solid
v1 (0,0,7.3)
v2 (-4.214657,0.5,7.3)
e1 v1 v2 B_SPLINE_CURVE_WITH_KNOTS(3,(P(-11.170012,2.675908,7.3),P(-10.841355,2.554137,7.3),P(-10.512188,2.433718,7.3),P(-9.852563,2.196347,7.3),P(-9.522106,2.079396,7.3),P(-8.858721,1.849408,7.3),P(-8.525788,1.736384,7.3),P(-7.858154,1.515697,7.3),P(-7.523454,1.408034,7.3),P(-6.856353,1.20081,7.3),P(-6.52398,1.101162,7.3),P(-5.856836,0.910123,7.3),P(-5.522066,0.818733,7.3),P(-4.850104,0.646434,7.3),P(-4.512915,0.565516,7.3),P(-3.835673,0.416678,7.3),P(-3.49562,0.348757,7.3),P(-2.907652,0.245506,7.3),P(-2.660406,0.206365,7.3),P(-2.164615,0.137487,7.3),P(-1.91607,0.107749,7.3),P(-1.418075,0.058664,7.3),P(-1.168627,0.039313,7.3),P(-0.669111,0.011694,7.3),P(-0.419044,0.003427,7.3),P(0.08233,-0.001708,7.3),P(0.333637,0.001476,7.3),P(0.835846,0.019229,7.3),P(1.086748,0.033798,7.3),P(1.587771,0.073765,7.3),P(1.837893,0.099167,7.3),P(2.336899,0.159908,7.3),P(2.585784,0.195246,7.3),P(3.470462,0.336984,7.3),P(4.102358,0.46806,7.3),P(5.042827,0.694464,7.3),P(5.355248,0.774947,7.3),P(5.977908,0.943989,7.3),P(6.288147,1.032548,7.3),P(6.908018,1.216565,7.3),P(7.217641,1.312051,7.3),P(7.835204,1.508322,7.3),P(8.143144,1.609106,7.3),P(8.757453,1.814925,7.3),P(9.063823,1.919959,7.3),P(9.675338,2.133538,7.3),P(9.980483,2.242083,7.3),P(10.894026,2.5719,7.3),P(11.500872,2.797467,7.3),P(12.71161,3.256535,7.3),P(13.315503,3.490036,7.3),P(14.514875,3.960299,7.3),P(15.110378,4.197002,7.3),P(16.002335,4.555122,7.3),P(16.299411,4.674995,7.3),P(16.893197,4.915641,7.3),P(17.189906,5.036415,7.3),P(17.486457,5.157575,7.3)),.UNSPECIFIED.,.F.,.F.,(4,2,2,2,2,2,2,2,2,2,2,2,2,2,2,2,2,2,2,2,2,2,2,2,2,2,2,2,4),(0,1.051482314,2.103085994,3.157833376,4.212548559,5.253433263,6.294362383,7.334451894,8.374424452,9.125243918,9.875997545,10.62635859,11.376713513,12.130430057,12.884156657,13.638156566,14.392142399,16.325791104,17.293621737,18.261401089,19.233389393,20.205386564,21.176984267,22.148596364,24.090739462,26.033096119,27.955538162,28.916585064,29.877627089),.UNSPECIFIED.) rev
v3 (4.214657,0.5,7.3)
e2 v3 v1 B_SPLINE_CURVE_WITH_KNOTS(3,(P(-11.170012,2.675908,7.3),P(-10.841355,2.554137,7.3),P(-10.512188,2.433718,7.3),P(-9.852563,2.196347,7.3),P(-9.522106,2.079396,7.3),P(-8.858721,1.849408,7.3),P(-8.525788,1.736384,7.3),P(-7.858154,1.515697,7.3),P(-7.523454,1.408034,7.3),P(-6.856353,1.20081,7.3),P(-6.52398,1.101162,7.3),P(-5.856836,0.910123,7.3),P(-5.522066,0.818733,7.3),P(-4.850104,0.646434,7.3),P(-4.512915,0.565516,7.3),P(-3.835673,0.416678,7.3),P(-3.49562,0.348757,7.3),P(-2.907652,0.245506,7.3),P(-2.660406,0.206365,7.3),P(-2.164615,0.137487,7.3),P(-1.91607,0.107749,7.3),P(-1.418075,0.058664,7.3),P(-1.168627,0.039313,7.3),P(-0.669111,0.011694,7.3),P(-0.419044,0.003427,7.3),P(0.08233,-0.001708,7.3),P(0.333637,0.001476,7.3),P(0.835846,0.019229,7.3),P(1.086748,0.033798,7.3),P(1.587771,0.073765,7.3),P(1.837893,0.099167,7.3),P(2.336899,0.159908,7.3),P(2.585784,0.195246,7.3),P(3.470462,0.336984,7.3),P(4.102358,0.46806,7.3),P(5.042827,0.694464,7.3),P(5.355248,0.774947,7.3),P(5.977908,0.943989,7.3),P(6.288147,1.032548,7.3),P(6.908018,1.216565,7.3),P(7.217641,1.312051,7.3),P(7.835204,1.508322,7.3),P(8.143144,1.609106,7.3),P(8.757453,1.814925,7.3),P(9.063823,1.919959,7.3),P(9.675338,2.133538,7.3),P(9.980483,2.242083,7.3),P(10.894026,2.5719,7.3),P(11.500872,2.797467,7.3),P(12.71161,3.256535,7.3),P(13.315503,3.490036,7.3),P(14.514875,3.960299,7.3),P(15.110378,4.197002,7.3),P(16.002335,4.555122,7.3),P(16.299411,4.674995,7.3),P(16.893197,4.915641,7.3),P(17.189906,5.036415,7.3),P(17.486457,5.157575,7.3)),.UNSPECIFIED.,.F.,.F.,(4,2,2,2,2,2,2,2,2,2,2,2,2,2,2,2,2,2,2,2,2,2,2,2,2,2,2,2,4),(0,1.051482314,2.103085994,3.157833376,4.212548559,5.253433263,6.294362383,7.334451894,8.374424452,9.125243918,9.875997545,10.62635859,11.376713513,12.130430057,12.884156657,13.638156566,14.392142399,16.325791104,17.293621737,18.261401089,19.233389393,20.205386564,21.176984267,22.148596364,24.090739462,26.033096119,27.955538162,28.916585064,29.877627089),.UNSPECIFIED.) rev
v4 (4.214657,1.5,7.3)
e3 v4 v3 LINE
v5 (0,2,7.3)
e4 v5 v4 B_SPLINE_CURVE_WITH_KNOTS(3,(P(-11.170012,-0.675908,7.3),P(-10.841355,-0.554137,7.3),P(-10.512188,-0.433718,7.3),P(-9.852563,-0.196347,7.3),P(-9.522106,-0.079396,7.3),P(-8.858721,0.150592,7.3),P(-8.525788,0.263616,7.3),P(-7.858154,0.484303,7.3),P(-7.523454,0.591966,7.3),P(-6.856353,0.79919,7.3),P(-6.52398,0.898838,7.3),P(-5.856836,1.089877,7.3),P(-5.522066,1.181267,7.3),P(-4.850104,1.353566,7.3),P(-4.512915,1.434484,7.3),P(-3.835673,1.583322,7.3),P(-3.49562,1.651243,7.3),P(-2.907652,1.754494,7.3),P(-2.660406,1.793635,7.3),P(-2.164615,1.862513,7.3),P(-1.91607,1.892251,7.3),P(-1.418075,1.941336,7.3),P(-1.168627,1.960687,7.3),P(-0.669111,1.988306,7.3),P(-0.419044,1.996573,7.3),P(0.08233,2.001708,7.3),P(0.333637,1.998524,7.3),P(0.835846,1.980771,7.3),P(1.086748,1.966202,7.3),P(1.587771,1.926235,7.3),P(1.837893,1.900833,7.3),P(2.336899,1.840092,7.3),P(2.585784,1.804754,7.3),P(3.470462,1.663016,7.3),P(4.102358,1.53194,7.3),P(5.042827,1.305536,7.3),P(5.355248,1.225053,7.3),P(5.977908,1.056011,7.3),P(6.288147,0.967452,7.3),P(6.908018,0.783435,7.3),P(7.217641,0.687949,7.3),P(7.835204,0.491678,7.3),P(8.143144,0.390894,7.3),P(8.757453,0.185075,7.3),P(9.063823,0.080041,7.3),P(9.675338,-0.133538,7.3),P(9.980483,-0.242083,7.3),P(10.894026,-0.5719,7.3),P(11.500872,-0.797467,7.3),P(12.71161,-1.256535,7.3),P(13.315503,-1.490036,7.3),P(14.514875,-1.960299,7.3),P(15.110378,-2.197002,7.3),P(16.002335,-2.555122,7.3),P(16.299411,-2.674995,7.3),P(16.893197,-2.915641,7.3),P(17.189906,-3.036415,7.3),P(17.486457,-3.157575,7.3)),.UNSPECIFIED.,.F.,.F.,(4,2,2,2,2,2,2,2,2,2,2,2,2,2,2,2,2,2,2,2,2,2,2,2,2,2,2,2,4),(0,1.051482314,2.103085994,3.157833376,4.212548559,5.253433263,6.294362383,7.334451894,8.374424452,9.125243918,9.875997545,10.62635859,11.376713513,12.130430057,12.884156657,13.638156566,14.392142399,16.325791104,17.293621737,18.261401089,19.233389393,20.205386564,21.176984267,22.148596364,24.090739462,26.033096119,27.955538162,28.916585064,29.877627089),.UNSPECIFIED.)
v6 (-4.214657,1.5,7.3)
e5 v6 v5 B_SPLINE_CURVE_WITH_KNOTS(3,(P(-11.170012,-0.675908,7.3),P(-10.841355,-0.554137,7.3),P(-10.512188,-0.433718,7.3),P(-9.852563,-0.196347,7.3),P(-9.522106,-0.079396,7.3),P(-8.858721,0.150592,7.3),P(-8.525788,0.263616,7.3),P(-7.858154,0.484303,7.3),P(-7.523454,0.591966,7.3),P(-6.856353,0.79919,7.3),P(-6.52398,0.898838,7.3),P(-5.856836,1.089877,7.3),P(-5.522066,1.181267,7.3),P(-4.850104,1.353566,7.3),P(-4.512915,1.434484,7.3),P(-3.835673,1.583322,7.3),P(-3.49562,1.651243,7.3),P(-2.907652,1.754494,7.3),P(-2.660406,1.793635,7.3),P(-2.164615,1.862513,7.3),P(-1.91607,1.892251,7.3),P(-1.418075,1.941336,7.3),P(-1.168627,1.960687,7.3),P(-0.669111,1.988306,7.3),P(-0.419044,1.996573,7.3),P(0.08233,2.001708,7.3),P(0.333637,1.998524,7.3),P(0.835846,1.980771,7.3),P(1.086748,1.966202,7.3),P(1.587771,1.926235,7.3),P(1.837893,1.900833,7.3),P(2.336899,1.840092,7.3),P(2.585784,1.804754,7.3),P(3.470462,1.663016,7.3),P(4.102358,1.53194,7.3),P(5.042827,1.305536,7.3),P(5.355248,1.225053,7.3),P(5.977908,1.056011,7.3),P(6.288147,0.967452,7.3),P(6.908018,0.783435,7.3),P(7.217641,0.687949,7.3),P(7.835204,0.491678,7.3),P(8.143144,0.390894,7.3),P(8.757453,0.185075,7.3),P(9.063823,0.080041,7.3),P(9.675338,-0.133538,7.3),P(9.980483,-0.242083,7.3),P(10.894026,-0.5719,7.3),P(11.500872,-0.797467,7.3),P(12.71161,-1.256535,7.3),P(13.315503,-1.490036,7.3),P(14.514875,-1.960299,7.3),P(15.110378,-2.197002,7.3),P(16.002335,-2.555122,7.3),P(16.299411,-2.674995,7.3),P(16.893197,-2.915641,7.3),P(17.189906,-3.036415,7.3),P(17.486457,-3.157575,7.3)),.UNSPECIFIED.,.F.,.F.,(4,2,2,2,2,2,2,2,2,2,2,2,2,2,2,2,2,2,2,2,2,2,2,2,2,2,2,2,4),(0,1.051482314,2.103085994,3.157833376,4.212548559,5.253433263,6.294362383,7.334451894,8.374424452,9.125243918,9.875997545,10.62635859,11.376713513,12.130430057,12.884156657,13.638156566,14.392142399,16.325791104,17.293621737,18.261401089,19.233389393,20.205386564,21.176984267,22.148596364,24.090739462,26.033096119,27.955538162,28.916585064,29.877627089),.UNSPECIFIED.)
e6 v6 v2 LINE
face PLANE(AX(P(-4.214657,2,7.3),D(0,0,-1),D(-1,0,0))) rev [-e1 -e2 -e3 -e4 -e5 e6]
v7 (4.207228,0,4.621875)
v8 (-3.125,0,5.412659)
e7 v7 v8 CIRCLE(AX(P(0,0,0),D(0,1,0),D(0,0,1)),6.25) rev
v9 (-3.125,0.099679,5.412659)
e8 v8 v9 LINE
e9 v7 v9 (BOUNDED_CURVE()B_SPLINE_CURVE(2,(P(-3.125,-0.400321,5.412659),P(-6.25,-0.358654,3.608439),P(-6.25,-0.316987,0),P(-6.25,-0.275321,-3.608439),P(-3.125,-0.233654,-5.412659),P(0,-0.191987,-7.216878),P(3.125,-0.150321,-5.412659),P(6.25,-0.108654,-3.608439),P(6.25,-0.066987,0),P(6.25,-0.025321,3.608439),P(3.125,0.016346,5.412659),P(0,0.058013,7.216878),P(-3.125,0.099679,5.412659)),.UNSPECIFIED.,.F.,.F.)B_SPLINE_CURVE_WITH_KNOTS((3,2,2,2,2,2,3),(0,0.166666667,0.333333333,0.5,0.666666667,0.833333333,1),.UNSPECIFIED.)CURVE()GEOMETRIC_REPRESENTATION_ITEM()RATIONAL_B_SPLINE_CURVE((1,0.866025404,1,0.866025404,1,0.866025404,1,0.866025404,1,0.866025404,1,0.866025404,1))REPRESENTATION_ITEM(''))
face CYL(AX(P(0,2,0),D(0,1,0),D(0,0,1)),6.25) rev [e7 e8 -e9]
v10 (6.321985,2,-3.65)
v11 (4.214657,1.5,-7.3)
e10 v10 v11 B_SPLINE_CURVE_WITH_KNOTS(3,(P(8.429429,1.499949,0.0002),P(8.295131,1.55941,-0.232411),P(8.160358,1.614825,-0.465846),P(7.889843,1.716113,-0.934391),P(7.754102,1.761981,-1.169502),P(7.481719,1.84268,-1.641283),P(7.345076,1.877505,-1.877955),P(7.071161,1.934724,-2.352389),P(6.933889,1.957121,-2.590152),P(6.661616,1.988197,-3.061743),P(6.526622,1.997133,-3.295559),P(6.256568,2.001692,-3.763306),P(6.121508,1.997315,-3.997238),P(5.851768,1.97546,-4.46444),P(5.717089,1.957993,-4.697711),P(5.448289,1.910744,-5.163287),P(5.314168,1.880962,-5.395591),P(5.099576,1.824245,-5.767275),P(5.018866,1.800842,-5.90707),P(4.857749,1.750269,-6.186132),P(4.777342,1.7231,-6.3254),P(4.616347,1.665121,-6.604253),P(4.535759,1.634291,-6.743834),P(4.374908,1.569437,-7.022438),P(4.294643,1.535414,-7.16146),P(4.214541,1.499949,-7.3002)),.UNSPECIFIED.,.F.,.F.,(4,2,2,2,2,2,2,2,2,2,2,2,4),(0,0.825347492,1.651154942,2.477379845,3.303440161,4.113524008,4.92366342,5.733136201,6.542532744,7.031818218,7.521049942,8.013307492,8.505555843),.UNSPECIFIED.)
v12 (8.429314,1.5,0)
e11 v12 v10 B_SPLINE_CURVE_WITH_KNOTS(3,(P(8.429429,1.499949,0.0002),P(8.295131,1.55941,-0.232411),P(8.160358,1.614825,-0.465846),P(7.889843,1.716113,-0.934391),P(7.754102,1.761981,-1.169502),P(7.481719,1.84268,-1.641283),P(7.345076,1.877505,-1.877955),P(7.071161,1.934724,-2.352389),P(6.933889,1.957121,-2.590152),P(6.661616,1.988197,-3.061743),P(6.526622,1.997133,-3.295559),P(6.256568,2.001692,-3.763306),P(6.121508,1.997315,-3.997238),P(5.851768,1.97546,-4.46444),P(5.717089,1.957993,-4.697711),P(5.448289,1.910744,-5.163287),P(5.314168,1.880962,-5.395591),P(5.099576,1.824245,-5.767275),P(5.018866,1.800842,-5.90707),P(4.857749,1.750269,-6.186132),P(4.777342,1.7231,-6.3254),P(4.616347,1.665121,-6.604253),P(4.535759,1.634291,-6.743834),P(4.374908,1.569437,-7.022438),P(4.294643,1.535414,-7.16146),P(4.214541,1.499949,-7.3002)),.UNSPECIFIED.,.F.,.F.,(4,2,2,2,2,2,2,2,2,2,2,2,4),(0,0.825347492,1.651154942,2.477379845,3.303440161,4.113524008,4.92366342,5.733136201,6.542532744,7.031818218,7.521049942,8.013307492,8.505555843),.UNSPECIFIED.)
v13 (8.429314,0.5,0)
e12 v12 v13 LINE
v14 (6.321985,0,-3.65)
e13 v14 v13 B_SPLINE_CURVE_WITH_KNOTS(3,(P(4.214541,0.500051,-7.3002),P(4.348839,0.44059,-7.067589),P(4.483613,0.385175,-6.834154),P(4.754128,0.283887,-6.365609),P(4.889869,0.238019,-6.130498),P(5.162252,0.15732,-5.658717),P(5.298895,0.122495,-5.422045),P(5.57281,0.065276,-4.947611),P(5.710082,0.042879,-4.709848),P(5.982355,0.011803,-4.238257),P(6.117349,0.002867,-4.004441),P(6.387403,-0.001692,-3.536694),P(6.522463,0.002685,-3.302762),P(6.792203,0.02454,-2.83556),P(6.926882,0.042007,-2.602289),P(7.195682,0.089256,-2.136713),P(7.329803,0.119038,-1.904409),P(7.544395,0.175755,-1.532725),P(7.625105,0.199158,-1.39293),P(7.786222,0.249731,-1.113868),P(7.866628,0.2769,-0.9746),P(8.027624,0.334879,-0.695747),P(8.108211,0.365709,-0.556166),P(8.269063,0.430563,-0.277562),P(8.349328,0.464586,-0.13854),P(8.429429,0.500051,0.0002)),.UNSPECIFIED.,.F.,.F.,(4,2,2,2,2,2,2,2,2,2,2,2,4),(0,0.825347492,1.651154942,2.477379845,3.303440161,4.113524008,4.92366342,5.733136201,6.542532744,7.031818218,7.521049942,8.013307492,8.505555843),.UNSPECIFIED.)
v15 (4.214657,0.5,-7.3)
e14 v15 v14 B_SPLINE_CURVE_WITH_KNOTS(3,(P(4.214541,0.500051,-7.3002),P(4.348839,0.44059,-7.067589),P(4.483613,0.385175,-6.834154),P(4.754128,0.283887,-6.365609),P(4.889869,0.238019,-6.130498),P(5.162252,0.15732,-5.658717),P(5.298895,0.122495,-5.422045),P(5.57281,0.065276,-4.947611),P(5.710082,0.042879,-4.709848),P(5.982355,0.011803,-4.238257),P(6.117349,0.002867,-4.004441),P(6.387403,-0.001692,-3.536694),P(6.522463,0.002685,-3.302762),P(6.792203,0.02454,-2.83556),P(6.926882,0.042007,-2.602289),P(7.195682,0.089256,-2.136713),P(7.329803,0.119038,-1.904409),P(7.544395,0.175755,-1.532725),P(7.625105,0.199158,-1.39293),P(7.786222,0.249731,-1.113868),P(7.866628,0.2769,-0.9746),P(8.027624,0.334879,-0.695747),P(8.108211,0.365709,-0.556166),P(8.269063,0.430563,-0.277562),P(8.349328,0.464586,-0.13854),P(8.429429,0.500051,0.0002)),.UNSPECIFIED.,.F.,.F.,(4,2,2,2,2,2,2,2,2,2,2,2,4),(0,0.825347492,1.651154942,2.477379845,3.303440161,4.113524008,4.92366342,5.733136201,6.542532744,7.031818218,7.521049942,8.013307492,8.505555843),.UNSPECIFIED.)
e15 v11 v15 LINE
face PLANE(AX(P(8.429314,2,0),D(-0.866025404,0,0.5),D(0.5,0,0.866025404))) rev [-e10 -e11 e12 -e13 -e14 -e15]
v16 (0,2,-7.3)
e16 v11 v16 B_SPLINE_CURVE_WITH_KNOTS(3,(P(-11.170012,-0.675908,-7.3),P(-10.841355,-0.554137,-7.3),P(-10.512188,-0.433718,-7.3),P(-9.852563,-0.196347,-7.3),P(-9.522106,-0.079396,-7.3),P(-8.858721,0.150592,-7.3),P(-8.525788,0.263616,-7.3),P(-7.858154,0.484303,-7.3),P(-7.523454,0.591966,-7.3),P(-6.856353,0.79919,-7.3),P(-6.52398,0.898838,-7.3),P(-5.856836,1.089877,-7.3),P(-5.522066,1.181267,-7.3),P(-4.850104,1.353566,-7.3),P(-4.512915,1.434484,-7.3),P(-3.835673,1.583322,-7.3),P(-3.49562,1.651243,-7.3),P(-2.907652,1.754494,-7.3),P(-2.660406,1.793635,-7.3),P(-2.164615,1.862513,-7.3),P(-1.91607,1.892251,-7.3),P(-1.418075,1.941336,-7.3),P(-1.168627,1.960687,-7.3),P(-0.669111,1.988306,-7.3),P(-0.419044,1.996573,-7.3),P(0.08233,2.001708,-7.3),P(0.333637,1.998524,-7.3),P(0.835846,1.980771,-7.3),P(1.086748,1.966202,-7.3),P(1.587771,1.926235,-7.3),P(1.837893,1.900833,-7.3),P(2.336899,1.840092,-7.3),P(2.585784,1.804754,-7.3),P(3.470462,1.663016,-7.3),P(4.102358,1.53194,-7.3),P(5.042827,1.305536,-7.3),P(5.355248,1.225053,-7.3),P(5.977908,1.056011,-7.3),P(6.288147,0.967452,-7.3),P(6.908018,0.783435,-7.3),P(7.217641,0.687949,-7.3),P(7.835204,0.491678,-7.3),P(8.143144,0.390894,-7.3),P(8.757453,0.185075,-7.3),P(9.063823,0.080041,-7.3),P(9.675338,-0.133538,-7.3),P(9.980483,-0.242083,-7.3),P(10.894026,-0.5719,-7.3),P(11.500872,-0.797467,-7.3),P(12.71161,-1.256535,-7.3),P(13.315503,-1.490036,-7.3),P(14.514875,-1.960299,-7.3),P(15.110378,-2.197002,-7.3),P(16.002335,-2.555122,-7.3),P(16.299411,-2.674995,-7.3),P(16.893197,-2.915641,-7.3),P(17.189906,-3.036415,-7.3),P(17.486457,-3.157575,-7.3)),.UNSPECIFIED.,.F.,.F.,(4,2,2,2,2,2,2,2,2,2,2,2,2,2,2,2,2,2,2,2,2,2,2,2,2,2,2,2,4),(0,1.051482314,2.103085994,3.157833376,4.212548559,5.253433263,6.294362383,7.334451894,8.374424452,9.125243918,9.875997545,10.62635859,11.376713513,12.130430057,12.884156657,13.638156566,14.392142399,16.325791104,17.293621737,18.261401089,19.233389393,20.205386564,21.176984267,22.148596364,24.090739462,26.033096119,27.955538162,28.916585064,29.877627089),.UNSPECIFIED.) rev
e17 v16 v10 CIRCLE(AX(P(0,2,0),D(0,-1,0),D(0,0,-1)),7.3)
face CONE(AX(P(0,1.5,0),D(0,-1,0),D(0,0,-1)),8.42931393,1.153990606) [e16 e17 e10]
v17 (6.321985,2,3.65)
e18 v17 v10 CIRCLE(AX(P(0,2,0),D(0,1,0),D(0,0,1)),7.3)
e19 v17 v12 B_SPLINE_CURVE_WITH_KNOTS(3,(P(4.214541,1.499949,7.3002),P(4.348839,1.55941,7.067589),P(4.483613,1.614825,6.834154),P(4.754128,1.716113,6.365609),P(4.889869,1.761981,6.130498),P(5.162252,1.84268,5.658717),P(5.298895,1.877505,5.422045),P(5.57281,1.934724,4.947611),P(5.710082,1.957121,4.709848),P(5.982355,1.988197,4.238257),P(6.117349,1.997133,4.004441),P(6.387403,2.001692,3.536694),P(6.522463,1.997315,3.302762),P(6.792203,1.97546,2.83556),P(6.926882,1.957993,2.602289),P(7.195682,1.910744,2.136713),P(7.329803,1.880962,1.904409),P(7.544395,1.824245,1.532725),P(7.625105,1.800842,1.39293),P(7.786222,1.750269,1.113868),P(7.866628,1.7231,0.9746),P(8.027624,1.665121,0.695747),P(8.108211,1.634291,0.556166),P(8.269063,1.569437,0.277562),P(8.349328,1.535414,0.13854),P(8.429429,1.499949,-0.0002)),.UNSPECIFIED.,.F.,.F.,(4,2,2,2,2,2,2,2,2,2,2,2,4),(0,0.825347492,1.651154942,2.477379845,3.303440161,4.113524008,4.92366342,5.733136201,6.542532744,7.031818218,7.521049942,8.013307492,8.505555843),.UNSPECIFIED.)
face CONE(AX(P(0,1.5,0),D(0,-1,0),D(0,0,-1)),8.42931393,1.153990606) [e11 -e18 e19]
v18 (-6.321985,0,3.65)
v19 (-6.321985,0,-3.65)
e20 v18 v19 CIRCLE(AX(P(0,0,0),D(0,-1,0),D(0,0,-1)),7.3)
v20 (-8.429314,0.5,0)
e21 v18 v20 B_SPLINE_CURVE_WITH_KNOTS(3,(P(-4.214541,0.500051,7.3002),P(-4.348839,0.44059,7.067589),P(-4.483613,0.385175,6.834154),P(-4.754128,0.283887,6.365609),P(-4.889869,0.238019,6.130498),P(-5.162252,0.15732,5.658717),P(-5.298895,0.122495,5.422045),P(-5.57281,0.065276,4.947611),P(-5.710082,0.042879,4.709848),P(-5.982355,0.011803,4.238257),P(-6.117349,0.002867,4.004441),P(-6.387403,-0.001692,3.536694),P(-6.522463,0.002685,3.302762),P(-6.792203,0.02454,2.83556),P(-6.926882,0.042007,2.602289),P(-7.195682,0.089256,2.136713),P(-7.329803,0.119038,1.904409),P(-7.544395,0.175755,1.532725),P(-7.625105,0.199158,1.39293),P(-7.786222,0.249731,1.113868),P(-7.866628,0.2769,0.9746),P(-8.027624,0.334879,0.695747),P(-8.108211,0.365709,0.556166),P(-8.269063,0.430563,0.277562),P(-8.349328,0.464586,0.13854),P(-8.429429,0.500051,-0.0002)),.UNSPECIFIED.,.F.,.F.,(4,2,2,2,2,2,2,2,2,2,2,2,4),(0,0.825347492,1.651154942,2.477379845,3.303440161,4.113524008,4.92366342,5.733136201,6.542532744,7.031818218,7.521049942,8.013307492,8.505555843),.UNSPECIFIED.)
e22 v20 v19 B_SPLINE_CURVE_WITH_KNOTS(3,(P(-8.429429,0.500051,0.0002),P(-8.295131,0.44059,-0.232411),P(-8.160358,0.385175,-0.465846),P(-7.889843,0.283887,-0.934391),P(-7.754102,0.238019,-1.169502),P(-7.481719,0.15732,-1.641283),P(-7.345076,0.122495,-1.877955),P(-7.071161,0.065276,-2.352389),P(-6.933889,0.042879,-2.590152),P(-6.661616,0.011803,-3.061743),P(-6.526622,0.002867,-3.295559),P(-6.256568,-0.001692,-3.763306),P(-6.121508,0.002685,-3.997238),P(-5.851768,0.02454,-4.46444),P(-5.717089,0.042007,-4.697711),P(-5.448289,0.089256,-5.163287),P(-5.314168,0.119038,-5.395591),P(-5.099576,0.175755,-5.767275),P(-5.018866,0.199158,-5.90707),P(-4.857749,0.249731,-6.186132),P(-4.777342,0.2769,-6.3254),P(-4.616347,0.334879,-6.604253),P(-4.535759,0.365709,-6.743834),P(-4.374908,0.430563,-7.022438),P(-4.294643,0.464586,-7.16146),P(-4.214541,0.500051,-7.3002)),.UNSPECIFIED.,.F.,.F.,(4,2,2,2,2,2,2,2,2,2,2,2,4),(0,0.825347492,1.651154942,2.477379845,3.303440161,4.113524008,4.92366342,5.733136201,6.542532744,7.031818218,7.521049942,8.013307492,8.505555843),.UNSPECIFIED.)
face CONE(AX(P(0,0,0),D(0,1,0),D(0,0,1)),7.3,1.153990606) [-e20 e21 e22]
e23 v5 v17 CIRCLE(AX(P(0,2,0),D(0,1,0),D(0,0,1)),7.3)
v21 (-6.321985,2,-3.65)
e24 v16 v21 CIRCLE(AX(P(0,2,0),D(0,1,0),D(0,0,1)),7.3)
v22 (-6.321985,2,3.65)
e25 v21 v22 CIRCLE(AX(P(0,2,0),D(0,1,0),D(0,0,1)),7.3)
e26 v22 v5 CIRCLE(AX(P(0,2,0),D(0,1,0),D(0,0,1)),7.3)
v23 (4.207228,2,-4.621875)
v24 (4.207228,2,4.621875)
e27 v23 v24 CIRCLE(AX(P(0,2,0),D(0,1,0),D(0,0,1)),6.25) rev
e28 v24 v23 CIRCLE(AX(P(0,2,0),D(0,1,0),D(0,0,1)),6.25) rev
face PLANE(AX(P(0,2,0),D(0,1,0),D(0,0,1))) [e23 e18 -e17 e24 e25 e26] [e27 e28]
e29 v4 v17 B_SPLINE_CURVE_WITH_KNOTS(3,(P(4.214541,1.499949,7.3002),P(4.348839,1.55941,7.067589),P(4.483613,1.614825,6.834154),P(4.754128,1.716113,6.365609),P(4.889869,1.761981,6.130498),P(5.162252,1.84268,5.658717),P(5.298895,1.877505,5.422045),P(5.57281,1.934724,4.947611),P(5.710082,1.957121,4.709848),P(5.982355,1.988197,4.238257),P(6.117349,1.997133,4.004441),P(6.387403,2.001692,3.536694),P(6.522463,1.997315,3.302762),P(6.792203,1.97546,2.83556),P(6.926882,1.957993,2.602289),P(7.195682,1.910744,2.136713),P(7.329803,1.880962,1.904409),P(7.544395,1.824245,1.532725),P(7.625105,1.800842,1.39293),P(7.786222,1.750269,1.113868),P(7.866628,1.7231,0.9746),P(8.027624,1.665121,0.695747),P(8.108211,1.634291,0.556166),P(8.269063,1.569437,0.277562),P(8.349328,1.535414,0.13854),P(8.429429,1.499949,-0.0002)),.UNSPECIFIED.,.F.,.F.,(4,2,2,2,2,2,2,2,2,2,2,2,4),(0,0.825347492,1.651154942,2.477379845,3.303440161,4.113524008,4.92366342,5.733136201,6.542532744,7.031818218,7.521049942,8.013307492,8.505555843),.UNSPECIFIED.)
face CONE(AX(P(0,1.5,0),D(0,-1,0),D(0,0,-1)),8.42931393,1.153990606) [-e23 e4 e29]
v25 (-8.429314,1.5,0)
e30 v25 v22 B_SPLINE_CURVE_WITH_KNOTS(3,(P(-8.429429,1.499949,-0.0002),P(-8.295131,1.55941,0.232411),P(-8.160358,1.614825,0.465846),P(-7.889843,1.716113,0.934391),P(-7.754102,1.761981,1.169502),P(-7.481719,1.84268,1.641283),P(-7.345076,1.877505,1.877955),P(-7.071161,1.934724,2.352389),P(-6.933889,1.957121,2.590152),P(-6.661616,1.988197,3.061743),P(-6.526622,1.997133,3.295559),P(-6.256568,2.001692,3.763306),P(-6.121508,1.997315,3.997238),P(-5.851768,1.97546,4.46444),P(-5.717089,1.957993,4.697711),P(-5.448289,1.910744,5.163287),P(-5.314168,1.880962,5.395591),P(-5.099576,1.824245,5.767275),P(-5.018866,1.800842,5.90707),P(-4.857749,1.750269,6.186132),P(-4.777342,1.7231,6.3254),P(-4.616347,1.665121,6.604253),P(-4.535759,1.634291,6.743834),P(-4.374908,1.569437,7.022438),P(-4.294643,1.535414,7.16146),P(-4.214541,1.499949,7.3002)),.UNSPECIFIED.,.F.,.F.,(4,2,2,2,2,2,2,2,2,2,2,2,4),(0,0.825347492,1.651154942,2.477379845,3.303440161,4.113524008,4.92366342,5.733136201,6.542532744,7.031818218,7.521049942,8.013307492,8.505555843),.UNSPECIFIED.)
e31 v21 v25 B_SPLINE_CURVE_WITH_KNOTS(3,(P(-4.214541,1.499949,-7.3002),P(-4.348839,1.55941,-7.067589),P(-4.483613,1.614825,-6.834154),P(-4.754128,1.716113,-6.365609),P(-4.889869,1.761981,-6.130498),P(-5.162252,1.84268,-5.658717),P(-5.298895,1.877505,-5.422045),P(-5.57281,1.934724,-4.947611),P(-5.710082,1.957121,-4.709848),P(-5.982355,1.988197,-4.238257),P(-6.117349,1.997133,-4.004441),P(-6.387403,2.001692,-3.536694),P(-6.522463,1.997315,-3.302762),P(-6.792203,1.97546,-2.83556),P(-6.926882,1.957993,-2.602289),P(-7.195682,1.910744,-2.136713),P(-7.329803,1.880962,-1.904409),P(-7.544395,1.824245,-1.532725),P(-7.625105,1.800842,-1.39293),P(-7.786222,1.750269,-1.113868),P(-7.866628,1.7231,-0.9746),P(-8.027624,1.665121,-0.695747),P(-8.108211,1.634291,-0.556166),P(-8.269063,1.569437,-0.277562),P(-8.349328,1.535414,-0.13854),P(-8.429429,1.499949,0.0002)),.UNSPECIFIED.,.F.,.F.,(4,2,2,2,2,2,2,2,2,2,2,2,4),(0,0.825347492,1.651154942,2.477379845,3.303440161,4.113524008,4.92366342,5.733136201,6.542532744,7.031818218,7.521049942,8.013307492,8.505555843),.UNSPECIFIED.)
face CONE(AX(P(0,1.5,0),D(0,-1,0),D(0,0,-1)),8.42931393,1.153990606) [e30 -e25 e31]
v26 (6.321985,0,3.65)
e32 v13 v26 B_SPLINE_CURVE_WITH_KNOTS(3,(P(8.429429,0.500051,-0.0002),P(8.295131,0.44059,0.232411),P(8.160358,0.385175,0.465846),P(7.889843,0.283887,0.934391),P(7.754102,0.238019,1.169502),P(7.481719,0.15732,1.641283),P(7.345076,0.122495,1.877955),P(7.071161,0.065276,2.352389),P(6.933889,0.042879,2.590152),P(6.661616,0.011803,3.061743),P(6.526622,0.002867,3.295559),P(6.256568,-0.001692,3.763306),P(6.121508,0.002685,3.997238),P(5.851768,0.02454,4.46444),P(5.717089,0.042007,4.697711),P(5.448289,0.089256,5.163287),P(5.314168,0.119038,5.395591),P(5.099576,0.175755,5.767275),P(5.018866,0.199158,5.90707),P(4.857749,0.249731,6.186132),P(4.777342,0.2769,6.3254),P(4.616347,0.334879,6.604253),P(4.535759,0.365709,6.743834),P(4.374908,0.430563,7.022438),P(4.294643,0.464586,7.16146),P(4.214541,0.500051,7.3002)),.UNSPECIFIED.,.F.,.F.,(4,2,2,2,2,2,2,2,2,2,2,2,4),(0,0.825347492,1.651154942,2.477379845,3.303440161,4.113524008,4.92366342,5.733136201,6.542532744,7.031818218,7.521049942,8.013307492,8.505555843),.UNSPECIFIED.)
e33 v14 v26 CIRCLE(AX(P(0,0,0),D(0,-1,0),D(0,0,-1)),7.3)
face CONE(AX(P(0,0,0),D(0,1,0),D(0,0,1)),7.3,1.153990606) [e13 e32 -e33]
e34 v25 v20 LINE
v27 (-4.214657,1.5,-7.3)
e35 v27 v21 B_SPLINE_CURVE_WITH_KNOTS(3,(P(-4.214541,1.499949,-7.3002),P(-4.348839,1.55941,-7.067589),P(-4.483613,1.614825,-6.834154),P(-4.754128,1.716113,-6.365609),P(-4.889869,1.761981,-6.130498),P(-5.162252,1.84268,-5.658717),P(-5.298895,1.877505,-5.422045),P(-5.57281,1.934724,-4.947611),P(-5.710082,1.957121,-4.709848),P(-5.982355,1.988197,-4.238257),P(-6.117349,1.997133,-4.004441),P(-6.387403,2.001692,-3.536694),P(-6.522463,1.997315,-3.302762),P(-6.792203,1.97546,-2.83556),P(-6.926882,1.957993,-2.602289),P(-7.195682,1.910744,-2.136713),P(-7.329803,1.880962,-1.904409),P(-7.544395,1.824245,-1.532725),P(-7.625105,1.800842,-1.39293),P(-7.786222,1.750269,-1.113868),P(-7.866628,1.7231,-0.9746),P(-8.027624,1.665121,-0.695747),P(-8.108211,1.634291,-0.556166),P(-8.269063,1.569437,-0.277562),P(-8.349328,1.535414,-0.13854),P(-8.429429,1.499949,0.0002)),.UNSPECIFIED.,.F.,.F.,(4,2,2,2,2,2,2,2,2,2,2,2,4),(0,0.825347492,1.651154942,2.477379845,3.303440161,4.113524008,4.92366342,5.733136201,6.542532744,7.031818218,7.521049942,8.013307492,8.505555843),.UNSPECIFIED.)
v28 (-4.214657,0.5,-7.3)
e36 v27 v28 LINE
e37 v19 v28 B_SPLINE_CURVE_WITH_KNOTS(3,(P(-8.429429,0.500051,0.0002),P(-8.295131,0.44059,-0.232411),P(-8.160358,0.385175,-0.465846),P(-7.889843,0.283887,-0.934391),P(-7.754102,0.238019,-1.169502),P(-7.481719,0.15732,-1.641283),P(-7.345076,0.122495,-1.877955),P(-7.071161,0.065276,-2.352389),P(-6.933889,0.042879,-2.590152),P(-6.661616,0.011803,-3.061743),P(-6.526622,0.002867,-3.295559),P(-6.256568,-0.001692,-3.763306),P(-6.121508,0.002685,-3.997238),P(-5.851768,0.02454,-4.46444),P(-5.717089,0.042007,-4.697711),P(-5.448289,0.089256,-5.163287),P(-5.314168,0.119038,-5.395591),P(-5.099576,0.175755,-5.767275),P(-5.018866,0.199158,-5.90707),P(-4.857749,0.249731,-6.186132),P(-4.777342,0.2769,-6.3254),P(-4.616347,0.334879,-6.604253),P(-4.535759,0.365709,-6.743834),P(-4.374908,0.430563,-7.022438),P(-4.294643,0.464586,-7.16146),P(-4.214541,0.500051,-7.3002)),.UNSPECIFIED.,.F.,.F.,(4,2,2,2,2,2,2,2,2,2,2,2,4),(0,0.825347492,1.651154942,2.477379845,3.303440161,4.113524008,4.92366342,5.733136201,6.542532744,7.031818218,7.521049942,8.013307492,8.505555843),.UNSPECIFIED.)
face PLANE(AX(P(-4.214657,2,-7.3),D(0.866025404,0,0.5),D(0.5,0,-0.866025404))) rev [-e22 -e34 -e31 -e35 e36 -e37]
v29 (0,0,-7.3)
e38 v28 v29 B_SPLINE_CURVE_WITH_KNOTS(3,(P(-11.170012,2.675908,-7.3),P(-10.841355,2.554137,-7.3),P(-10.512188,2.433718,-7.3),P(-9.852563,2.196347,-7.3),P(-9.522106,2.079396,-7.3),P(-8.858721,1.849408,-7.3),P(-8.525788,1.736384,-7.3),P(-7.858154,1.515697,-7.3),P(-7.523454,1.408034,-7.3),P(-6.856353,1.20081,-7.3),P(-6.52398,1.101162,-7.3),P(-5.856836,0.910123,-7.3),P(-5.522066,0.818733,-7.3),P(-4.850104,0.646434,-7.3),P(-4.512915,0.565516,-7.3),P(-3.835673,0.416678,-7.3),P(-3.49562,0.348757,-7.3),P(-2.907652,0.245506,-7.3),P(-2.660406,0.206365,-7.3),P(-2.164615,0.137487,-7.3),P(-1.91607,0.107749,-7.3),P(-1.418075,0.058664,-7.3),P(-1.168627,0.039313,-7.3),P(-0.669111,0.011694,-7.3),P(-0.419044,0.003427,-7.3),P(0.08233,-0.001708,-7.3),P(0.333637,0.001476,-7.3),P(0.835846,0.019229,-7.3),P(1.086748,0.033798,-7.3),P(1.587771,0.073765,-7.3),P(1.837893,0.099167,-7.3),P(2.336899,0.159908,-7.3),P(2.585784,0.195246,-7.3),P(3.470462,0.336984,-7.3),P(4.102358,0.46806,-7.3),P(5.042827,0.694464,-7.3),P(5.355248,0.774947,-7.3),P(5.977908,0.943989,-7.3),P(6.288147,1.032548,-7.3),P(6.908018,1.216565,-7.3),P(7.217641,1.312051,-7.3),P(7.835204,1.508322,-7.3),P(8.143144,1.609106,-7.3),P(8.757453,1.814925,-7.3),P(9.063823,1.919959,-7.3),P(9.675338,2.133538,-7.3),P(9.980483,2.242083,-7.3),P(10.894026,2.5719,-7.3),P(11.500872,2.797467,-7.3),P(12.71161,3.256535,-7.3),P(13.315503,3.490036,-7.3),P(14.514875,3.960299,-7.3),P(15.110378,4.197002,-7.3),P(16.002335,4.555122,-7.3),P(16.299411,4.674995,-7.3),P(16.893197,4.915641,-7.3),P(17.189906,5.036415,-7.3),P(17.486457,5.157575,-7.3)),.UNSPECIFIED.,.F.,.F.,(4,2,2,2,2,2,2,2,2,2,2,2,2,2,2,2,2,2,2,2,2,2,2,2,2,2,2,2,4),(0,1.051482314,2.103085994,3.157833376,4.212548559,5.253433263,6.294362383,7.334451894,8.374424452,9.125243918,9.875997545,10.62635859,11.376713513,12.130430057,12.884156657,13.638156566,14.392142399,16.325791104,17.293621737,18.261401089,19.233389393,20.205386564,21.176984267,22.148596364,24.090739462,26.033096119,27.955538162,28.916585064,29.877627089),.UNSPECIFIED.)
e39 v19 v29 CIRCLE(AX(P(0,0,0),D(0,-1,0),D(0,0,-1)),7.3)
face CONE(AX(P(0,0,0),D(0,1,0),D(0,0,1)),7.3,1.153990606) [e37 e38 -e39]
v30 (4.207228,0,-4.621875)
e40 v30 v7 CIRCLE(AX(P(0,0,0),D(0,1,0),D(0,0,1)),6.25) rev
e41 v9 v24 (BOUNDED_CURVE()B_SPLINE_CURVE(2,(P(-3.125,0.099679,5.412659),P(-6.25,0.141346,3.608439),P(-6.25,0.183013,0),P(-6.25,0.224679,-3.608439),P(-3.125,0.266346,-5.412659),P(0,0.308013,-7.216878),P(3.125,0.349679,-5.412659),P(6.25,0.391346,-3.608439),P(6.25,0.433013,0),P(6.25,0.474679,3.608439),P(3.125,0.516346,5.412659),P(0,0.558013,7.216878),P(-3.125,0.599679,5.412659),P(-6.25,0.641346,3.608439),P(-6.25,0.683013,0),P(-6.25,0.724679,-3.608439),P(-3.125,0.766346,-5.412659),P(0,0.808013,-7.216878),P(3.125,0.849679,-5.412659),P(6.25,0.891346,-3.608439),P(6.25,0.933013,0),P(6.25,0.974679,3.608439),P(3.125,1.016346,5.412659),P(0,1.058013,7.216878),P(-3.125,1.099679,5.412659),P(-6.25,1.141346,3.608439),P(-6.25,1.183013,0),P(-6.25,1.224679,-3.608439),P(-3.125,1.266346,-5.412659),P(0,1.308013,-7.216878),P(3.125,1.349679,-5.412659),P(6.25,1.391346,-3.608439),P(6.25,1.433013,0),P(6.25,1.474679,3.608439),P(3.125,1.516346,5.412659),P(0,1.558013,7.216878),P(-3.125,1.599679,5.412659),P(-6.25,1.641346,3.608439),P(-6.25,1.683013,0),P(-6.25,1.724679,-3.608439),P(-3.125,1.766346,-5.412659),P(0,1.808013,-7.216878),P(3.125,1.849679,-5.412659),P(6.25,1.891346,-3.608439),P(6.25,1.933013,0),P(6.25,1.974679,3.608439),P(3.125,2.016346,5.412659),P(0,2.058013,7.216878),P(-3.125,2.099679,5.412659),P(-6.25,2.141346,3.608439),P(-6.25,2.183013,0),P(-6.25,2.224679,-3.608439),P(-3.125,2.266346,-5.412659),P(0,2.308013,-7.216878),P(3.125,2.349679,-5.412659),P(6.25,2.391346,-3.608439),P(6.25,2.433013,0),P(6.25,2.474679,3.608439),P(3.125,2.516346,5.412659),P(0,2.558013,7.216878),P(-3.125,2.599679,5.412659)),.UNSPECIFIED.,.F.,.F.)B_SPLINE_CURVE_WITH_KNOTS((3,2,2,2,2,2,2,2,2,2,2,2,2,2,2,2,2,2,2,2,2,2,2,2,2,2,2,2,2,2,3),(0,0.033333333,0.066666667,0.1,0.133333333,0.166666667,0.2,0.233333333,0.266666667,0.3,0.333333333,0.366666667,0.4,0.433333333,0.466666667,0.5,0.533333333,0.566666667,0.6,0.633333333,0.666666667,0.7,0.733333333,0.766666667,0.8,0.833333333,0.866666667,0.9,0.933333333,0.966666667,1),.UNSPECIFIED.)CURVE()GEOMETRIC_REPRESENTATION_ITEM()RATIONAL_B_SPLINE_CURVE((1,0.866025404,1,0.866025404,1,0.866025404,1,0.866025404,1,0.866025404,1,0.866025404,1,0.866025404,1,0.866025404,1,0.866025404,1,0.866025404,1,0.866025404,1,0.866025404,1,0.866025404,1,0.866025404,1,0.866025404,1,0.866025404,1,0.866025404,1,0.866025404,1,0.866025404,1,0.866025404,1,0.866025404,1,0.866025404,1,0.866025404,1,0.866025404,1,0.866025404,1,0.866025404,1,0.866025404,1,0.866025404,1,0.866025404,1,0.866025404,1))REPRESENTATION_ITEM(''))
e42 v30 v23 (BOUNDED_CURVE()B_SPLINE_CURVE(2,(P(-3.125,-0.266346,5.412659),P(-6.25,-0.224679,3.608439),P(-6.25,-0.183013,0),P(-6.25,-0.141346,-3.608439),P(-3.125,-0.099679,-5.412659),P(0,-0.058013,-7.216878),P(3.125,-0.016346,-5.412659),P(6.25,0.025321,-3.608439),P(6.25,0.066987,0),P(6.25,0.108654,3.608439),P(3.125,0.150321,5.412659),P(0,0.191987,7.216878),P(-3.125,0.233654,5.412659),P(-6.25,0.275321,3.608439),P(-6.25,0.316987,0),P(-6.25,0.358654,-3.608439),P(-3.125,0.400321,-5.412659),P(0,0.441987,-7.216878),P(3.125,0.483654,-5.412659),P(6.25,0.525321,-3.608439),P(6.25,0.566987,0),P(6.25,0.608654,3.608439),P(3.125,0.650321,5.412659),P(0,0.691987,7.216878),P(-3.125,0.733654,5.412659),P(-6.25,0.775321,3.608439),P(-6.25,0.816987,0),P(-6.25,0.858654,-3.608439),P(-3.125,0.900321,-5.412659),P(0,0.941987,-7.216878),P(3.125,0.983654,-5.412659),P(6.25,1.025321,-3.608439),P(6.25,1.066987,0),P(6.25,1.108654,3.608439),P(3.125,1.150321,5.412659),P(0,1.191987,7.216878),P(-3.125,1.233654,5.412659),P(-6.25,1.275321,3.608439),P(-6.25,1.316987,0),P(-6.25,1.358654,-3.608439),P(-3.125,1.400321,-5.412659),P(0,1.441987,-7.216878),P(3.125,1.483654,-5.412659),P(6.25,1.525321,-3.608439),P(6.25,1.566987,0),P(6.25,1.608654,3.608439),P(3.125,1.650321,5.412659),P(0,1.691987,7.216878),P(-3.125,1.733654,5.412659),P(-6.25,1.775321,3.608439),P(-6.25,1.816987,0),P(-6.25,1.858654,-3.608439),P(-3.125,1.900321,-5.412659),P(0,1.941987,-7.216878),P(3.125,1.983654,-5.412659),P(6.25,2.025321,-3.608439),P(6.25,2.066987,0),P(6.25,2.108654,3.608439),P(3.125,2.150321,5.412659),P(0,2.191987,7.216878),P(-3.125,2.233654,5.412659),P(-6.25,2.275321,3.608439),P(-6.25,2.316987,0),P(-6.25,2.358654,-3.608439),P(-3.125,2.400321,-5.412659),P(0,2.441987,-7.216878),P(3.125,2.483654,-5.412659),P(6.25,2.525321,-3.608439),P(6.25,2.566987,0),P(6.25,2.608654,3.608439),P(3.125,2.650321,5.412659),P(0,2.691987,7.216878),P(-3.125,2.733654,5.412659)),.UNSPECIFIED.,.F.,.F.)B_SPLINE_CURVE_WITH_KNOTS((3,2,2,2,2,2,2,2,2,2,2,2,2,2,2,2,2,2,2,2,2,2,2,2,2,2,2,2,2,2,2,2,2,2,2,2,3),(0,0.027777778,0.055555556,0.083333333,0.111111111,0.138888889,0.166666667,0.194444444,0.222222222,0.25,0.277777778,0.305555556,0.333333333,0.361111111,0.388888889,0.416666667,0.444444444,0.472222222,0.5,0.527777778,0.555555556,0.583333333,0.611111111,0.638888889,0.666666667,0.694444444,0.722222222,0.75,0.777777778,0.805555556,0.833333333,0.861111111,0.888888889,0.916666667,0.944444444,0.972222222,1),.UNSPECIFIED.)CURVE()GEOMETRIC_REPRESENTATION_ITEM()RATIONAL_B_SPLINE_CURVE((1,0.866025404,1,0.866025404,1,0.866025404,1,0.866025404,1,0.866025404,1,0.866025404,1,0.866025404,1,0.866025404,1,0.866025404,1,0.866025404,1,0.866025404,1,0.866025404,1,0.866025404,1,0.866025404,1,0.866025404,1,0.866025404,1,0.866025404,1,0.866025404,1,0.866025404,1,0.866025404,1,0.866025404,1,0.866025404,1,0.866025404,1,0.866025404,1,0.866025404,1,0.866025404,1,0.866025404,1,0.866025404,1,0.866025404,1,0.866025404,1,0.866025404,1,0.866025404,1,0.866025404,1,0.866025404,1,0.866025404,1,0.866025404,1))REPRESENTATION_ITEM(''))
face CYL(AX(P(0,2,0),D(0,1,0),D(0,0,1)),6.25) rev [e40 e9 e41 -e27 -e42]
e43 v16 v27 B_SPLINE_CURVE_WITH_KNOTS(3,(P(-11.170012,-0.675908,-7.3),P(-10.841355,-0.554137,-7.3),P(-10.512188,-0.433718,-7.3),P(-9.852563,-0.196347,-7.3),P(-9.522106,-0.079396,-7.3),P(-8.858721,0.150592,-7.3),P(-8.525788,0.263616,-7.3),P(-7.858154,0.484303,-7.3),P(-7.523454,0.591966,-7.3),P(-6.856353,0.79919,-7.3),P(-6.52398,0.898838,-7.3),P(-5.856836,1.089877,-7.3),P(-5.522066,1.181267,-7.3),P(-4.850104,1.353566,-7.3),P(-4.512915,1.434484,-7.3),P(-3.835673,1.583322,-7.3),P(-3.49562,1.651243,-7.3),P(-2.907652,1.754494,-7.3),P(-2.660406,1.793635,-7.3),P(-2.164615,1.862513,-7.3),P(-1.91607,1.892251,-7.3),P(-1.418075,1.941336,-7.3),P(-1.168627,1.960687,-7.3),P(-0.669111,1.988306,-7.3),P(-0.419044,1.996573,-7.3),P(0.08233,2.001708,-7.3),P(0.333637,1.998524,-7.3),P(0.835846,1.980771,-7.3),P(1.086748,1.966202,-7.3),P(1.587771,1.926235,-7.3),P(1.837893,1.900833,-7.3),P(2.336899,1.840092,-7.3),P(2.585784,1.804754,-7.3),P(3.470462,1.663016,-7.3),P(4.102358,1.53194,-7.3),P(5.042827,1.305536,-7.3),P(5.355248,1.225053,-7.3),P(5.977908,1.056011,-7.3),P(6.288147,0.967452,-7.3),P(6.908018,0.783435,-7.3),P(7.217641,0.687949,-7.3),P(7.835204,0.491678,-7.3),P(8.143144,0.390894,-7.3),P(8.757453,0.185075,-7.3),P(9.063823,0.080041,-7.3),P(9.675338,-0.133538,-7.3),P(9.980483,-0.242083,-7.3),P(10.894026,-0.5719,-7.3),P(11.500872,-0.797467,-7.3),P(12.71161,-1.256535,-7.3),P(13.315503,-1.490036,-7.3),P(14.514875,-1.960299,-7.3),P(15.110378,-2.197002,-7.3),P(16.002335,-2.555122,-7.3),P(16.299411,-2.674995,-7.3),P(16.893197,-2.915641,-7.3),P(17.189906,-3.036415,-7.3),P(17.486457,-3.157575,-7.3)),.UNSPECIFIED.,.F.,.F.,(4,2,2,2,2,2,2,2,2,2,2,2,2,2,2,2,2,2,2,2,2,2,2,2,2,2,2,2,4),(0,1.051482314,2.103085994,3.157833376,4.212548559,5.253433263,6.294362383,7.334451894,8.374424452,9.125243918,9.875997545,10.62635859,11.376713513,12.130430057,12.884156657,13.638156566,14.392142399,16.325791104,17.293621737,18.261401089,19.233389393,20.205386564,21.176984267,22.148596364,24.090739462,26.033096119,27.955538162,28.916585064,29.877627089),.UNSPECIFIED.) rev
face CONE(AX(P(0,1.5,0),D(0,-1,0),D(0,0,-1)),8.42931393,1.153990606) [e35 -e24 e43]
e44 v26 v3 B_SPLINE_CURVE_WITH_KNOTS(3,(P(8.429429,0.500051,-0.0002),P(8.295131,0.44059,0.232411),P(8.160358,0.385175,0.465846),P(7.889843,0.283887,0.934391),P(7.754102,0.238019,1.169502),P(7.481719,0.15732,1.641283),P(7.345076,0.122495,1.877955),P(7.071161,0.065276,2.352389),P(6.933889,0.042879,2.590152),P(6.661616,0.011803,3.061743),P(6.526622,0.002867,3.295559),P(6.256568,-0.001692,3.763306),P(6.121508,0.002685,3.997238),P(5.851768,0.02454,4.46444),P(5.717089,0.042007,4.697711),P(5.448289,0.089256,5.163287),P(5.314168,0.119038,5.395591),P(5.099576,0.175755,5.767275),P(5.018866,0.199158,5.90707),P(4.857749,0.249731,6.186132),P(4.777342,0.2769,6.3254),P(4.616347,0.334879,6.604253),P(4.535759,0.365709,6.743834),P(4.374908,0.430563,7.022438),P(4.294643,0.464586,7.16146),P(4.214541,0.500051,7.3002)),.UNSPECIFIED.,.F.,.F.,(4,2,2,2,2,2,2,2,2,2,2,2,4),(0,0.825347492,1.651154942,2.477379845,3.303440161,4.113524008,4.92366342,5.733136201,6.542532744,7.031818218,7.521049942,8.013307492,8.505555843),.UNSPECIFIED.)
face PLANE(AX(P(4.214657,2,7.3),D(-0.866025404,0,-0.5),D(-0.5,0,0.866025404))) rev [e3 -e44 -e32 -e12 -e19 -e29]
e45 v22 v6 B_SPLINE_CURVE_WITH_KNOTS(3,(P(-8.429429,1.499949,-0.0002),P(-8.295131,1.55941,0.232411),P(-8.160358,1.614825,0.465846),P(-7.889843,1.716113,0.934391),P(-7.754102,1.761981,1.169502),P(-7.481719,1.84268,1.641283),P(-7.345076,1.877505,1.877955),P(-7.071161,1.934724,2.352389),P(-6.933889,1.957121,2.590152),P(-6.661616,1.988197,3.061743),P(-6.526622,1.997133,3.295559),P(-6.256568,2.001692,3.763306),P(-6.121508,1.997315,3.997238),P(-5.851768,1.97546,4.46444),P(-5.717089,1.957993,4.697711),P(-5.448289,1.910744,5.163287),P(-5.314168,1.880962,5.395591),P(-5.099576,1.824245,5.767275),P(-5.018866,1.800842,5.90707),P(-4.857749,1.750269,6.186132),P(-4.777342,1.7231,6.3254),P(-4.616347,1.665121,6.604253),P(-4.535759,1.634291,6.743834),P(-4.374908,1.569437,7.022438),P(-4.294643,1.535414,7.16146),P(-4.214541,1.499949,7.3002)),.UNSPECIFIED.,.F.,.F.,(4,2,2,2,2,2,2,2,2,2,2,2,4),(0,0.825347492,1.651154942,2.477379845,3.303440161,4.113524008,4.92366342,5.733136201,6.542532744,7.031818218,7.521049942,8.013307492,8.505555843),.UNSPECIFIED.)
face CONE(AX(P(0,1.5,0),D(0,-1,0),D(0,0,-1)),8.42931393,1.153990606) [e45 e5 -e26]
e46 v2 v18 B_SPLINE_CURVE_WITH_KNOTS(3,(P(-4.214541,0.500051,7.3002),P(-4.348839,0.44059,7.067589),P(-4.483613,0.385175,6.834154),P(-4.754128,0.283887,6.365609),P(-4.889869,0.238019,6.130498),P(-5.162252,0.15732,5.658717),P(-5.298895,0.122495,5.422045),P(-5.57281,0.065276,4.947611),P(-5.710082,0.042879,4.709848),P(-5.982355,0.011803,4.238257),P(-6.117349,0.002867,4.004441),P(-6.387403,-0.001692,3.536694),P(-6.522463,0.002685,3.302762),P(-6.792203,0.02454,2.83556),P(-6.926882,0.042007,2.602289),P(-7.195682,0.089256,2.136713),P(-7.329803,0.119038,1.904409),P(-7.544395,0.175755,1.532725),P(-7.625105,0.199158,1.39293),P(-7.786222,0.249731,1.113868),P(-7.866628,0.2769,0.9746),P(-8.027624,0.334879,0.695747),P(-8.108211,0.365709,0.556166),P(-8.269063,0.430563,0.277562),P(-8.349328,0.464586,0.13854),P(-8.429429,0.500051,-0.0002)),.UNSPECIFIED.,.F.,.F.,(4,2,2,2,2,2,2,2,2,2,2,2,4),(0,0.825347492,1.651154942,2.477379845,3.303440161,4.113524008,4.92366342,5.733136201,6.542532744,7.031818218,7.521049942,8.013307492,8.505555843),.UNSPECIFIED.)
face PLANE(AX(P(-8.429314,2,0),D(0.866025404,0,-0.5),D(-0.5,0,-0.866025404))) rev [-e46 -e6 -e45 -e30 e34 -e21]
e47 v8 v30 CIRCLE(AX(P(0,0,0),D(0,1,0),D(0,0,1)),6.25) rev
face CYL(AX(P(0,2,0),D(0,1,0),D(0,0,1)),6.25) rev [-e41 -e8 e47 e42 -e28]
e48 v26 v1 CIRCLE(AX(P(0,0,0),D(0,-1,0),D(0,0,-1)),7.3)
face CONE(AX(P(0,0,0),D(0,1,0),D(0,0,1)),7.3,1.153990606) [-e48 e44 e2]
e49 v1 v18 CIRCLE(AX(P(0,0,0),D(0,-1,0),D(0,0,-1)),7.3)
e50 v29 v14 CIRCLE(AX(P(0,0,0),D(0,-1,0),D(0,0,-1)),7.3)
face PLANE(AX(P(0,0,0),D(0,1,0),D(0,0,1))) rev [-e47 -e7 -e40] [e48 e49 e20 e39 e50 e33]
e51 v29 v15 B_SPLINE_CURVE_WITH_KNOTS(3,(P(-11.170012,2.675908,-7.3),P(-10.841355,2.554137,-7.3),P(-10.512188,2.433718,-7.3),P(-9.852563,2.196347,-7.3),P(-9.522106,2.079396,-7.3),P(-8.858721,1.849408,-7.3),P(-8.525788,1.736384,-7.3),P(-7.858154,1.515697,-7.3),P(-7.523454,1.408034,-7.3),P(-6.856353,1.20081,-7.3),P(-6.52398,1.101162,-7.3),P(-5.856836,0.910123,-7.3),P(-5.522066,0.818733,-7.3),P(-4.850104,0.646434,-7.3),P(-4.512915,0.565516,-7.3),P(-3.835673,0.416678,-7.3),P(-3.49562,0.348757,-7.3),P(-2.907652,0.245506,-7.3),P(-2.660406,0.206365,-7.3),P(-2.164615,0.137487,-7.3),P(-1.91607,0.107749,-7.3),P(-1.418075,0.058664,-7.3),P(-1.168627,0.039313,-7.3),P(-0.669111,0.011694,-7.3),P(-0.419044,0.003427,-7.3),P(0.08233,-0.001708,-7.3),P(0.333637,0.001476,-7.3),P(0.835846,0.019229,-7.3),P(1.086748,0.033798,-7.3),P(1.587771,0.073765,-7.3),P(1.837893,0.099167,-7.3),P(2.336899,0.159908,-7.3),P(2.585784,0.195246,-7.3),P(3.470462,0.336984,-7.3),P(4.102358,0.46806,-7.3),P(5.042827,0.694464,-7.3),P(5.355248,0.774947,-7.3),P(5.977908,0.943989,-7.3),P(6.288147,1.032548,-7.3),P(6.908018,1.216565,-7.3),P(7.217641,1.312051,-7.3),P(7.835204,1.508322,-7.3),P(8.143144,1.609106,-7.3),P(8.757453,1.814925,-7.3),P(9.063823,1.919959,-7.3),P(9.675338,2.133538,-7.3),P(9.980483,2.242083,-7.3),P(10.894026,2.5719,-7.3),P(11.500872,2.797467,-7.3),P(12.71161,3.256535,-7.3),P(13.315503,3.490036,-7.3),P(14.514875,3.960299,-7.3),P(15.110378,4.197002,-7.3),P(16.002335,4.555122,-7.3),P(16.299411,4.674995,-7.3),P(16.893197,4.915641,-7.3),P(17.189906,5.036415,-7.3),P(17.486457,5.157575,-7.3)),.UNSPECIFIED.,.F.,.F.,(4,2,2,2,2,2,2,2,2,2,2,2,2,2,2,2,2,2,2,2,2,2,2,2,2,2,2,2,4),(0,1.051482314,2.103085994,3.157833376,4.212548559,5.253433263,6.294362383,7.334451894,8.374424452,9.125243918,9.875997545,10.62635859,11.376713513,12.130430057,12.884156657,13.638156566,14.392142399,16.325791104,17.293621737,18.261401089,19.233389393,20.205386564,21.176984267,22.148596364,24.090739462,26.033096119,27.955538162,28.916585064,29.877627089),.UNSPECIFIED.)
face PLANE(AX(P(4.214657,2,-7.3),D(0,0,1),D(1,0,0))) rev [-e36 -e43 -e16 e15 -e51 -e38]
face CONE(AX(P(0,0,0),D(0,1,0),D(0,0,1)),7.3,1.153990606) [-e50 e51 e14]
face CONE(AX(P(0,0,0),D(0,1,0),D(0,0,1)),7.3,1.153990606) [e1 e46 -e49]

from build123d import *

# Parameters (mm, degrees)
SKETCH1_R            = 6
BOSS_EXTRUDE1_DEPTH  = 2
CUT_SWEEP1_OUTLINE_R = 6
CUT_SWEEP1_DEPTH     = 2


# Read off the part's stored shape, not the designer's step: Cut-Sweep1
with BuildPart() as part:
    # Sketch1 → Boss-Extrude1 (new body)
    with BuildSketch(Plane(origin=(0, 0, 0), x_dir=(1, 0, 0), z_dir=(0, 1, 0))):
        Polygon((8.42931393, 0), (4.214656965, 7.3), (-4.214656965, 7.3), (-8.42931393, 0), (-4.214656965, -7.3), (4.214656965, -7.3), align=None)
        with Locations(Location((0, 0, 0), (0, 0, 270))):
            Circle(SKETCH1_R, mode=Mode.SUBTRACT)
    extrude(amount=BOSS_EXTRUDE1_DEPTH)

    # Sketch3 → Cut-Revolve1 (revolve, cut)
    with BuildSketch(Plane.XY):
        Polygon((-8.42931393, 0), (-8.42931393, 0.5), (-7.3, 0), align=None)
        Polygon((-8.42931393, 2), (-8.42931393, 1.5), (-7.3, 2), align=None)
    revolve(axis=Axis((0, 0, 0), (0, 1, 0)), mode=Mode.SUBTRACT)

    # Cut-Sweep1 outline → Cut-Sweep1 (cut)
    with BuildSketch(Plane(origin=(0, 0, 0), x_dir=(1, 0, 0), z_dir=(0, 1, 0))):
        with BuildLine():
            ThreePointArc((4.207228142, -4.621875307), (-0.67017838, 6.213964993), (-3.125, -5.412658774))
            ThreePointArc((-3.125, -5.412658774), (0.67017838, -6.213964993), (4.207228142, -4.621875307))
        make_face()
        Circle(CUT_SWEEP1_OUTLINE_R, mode=Mode.SUBTRACT)
    extrude(amount=CUT_SWEEP1_DEPTH, mode=Mode.SUBTRACT)


solid = part.part
